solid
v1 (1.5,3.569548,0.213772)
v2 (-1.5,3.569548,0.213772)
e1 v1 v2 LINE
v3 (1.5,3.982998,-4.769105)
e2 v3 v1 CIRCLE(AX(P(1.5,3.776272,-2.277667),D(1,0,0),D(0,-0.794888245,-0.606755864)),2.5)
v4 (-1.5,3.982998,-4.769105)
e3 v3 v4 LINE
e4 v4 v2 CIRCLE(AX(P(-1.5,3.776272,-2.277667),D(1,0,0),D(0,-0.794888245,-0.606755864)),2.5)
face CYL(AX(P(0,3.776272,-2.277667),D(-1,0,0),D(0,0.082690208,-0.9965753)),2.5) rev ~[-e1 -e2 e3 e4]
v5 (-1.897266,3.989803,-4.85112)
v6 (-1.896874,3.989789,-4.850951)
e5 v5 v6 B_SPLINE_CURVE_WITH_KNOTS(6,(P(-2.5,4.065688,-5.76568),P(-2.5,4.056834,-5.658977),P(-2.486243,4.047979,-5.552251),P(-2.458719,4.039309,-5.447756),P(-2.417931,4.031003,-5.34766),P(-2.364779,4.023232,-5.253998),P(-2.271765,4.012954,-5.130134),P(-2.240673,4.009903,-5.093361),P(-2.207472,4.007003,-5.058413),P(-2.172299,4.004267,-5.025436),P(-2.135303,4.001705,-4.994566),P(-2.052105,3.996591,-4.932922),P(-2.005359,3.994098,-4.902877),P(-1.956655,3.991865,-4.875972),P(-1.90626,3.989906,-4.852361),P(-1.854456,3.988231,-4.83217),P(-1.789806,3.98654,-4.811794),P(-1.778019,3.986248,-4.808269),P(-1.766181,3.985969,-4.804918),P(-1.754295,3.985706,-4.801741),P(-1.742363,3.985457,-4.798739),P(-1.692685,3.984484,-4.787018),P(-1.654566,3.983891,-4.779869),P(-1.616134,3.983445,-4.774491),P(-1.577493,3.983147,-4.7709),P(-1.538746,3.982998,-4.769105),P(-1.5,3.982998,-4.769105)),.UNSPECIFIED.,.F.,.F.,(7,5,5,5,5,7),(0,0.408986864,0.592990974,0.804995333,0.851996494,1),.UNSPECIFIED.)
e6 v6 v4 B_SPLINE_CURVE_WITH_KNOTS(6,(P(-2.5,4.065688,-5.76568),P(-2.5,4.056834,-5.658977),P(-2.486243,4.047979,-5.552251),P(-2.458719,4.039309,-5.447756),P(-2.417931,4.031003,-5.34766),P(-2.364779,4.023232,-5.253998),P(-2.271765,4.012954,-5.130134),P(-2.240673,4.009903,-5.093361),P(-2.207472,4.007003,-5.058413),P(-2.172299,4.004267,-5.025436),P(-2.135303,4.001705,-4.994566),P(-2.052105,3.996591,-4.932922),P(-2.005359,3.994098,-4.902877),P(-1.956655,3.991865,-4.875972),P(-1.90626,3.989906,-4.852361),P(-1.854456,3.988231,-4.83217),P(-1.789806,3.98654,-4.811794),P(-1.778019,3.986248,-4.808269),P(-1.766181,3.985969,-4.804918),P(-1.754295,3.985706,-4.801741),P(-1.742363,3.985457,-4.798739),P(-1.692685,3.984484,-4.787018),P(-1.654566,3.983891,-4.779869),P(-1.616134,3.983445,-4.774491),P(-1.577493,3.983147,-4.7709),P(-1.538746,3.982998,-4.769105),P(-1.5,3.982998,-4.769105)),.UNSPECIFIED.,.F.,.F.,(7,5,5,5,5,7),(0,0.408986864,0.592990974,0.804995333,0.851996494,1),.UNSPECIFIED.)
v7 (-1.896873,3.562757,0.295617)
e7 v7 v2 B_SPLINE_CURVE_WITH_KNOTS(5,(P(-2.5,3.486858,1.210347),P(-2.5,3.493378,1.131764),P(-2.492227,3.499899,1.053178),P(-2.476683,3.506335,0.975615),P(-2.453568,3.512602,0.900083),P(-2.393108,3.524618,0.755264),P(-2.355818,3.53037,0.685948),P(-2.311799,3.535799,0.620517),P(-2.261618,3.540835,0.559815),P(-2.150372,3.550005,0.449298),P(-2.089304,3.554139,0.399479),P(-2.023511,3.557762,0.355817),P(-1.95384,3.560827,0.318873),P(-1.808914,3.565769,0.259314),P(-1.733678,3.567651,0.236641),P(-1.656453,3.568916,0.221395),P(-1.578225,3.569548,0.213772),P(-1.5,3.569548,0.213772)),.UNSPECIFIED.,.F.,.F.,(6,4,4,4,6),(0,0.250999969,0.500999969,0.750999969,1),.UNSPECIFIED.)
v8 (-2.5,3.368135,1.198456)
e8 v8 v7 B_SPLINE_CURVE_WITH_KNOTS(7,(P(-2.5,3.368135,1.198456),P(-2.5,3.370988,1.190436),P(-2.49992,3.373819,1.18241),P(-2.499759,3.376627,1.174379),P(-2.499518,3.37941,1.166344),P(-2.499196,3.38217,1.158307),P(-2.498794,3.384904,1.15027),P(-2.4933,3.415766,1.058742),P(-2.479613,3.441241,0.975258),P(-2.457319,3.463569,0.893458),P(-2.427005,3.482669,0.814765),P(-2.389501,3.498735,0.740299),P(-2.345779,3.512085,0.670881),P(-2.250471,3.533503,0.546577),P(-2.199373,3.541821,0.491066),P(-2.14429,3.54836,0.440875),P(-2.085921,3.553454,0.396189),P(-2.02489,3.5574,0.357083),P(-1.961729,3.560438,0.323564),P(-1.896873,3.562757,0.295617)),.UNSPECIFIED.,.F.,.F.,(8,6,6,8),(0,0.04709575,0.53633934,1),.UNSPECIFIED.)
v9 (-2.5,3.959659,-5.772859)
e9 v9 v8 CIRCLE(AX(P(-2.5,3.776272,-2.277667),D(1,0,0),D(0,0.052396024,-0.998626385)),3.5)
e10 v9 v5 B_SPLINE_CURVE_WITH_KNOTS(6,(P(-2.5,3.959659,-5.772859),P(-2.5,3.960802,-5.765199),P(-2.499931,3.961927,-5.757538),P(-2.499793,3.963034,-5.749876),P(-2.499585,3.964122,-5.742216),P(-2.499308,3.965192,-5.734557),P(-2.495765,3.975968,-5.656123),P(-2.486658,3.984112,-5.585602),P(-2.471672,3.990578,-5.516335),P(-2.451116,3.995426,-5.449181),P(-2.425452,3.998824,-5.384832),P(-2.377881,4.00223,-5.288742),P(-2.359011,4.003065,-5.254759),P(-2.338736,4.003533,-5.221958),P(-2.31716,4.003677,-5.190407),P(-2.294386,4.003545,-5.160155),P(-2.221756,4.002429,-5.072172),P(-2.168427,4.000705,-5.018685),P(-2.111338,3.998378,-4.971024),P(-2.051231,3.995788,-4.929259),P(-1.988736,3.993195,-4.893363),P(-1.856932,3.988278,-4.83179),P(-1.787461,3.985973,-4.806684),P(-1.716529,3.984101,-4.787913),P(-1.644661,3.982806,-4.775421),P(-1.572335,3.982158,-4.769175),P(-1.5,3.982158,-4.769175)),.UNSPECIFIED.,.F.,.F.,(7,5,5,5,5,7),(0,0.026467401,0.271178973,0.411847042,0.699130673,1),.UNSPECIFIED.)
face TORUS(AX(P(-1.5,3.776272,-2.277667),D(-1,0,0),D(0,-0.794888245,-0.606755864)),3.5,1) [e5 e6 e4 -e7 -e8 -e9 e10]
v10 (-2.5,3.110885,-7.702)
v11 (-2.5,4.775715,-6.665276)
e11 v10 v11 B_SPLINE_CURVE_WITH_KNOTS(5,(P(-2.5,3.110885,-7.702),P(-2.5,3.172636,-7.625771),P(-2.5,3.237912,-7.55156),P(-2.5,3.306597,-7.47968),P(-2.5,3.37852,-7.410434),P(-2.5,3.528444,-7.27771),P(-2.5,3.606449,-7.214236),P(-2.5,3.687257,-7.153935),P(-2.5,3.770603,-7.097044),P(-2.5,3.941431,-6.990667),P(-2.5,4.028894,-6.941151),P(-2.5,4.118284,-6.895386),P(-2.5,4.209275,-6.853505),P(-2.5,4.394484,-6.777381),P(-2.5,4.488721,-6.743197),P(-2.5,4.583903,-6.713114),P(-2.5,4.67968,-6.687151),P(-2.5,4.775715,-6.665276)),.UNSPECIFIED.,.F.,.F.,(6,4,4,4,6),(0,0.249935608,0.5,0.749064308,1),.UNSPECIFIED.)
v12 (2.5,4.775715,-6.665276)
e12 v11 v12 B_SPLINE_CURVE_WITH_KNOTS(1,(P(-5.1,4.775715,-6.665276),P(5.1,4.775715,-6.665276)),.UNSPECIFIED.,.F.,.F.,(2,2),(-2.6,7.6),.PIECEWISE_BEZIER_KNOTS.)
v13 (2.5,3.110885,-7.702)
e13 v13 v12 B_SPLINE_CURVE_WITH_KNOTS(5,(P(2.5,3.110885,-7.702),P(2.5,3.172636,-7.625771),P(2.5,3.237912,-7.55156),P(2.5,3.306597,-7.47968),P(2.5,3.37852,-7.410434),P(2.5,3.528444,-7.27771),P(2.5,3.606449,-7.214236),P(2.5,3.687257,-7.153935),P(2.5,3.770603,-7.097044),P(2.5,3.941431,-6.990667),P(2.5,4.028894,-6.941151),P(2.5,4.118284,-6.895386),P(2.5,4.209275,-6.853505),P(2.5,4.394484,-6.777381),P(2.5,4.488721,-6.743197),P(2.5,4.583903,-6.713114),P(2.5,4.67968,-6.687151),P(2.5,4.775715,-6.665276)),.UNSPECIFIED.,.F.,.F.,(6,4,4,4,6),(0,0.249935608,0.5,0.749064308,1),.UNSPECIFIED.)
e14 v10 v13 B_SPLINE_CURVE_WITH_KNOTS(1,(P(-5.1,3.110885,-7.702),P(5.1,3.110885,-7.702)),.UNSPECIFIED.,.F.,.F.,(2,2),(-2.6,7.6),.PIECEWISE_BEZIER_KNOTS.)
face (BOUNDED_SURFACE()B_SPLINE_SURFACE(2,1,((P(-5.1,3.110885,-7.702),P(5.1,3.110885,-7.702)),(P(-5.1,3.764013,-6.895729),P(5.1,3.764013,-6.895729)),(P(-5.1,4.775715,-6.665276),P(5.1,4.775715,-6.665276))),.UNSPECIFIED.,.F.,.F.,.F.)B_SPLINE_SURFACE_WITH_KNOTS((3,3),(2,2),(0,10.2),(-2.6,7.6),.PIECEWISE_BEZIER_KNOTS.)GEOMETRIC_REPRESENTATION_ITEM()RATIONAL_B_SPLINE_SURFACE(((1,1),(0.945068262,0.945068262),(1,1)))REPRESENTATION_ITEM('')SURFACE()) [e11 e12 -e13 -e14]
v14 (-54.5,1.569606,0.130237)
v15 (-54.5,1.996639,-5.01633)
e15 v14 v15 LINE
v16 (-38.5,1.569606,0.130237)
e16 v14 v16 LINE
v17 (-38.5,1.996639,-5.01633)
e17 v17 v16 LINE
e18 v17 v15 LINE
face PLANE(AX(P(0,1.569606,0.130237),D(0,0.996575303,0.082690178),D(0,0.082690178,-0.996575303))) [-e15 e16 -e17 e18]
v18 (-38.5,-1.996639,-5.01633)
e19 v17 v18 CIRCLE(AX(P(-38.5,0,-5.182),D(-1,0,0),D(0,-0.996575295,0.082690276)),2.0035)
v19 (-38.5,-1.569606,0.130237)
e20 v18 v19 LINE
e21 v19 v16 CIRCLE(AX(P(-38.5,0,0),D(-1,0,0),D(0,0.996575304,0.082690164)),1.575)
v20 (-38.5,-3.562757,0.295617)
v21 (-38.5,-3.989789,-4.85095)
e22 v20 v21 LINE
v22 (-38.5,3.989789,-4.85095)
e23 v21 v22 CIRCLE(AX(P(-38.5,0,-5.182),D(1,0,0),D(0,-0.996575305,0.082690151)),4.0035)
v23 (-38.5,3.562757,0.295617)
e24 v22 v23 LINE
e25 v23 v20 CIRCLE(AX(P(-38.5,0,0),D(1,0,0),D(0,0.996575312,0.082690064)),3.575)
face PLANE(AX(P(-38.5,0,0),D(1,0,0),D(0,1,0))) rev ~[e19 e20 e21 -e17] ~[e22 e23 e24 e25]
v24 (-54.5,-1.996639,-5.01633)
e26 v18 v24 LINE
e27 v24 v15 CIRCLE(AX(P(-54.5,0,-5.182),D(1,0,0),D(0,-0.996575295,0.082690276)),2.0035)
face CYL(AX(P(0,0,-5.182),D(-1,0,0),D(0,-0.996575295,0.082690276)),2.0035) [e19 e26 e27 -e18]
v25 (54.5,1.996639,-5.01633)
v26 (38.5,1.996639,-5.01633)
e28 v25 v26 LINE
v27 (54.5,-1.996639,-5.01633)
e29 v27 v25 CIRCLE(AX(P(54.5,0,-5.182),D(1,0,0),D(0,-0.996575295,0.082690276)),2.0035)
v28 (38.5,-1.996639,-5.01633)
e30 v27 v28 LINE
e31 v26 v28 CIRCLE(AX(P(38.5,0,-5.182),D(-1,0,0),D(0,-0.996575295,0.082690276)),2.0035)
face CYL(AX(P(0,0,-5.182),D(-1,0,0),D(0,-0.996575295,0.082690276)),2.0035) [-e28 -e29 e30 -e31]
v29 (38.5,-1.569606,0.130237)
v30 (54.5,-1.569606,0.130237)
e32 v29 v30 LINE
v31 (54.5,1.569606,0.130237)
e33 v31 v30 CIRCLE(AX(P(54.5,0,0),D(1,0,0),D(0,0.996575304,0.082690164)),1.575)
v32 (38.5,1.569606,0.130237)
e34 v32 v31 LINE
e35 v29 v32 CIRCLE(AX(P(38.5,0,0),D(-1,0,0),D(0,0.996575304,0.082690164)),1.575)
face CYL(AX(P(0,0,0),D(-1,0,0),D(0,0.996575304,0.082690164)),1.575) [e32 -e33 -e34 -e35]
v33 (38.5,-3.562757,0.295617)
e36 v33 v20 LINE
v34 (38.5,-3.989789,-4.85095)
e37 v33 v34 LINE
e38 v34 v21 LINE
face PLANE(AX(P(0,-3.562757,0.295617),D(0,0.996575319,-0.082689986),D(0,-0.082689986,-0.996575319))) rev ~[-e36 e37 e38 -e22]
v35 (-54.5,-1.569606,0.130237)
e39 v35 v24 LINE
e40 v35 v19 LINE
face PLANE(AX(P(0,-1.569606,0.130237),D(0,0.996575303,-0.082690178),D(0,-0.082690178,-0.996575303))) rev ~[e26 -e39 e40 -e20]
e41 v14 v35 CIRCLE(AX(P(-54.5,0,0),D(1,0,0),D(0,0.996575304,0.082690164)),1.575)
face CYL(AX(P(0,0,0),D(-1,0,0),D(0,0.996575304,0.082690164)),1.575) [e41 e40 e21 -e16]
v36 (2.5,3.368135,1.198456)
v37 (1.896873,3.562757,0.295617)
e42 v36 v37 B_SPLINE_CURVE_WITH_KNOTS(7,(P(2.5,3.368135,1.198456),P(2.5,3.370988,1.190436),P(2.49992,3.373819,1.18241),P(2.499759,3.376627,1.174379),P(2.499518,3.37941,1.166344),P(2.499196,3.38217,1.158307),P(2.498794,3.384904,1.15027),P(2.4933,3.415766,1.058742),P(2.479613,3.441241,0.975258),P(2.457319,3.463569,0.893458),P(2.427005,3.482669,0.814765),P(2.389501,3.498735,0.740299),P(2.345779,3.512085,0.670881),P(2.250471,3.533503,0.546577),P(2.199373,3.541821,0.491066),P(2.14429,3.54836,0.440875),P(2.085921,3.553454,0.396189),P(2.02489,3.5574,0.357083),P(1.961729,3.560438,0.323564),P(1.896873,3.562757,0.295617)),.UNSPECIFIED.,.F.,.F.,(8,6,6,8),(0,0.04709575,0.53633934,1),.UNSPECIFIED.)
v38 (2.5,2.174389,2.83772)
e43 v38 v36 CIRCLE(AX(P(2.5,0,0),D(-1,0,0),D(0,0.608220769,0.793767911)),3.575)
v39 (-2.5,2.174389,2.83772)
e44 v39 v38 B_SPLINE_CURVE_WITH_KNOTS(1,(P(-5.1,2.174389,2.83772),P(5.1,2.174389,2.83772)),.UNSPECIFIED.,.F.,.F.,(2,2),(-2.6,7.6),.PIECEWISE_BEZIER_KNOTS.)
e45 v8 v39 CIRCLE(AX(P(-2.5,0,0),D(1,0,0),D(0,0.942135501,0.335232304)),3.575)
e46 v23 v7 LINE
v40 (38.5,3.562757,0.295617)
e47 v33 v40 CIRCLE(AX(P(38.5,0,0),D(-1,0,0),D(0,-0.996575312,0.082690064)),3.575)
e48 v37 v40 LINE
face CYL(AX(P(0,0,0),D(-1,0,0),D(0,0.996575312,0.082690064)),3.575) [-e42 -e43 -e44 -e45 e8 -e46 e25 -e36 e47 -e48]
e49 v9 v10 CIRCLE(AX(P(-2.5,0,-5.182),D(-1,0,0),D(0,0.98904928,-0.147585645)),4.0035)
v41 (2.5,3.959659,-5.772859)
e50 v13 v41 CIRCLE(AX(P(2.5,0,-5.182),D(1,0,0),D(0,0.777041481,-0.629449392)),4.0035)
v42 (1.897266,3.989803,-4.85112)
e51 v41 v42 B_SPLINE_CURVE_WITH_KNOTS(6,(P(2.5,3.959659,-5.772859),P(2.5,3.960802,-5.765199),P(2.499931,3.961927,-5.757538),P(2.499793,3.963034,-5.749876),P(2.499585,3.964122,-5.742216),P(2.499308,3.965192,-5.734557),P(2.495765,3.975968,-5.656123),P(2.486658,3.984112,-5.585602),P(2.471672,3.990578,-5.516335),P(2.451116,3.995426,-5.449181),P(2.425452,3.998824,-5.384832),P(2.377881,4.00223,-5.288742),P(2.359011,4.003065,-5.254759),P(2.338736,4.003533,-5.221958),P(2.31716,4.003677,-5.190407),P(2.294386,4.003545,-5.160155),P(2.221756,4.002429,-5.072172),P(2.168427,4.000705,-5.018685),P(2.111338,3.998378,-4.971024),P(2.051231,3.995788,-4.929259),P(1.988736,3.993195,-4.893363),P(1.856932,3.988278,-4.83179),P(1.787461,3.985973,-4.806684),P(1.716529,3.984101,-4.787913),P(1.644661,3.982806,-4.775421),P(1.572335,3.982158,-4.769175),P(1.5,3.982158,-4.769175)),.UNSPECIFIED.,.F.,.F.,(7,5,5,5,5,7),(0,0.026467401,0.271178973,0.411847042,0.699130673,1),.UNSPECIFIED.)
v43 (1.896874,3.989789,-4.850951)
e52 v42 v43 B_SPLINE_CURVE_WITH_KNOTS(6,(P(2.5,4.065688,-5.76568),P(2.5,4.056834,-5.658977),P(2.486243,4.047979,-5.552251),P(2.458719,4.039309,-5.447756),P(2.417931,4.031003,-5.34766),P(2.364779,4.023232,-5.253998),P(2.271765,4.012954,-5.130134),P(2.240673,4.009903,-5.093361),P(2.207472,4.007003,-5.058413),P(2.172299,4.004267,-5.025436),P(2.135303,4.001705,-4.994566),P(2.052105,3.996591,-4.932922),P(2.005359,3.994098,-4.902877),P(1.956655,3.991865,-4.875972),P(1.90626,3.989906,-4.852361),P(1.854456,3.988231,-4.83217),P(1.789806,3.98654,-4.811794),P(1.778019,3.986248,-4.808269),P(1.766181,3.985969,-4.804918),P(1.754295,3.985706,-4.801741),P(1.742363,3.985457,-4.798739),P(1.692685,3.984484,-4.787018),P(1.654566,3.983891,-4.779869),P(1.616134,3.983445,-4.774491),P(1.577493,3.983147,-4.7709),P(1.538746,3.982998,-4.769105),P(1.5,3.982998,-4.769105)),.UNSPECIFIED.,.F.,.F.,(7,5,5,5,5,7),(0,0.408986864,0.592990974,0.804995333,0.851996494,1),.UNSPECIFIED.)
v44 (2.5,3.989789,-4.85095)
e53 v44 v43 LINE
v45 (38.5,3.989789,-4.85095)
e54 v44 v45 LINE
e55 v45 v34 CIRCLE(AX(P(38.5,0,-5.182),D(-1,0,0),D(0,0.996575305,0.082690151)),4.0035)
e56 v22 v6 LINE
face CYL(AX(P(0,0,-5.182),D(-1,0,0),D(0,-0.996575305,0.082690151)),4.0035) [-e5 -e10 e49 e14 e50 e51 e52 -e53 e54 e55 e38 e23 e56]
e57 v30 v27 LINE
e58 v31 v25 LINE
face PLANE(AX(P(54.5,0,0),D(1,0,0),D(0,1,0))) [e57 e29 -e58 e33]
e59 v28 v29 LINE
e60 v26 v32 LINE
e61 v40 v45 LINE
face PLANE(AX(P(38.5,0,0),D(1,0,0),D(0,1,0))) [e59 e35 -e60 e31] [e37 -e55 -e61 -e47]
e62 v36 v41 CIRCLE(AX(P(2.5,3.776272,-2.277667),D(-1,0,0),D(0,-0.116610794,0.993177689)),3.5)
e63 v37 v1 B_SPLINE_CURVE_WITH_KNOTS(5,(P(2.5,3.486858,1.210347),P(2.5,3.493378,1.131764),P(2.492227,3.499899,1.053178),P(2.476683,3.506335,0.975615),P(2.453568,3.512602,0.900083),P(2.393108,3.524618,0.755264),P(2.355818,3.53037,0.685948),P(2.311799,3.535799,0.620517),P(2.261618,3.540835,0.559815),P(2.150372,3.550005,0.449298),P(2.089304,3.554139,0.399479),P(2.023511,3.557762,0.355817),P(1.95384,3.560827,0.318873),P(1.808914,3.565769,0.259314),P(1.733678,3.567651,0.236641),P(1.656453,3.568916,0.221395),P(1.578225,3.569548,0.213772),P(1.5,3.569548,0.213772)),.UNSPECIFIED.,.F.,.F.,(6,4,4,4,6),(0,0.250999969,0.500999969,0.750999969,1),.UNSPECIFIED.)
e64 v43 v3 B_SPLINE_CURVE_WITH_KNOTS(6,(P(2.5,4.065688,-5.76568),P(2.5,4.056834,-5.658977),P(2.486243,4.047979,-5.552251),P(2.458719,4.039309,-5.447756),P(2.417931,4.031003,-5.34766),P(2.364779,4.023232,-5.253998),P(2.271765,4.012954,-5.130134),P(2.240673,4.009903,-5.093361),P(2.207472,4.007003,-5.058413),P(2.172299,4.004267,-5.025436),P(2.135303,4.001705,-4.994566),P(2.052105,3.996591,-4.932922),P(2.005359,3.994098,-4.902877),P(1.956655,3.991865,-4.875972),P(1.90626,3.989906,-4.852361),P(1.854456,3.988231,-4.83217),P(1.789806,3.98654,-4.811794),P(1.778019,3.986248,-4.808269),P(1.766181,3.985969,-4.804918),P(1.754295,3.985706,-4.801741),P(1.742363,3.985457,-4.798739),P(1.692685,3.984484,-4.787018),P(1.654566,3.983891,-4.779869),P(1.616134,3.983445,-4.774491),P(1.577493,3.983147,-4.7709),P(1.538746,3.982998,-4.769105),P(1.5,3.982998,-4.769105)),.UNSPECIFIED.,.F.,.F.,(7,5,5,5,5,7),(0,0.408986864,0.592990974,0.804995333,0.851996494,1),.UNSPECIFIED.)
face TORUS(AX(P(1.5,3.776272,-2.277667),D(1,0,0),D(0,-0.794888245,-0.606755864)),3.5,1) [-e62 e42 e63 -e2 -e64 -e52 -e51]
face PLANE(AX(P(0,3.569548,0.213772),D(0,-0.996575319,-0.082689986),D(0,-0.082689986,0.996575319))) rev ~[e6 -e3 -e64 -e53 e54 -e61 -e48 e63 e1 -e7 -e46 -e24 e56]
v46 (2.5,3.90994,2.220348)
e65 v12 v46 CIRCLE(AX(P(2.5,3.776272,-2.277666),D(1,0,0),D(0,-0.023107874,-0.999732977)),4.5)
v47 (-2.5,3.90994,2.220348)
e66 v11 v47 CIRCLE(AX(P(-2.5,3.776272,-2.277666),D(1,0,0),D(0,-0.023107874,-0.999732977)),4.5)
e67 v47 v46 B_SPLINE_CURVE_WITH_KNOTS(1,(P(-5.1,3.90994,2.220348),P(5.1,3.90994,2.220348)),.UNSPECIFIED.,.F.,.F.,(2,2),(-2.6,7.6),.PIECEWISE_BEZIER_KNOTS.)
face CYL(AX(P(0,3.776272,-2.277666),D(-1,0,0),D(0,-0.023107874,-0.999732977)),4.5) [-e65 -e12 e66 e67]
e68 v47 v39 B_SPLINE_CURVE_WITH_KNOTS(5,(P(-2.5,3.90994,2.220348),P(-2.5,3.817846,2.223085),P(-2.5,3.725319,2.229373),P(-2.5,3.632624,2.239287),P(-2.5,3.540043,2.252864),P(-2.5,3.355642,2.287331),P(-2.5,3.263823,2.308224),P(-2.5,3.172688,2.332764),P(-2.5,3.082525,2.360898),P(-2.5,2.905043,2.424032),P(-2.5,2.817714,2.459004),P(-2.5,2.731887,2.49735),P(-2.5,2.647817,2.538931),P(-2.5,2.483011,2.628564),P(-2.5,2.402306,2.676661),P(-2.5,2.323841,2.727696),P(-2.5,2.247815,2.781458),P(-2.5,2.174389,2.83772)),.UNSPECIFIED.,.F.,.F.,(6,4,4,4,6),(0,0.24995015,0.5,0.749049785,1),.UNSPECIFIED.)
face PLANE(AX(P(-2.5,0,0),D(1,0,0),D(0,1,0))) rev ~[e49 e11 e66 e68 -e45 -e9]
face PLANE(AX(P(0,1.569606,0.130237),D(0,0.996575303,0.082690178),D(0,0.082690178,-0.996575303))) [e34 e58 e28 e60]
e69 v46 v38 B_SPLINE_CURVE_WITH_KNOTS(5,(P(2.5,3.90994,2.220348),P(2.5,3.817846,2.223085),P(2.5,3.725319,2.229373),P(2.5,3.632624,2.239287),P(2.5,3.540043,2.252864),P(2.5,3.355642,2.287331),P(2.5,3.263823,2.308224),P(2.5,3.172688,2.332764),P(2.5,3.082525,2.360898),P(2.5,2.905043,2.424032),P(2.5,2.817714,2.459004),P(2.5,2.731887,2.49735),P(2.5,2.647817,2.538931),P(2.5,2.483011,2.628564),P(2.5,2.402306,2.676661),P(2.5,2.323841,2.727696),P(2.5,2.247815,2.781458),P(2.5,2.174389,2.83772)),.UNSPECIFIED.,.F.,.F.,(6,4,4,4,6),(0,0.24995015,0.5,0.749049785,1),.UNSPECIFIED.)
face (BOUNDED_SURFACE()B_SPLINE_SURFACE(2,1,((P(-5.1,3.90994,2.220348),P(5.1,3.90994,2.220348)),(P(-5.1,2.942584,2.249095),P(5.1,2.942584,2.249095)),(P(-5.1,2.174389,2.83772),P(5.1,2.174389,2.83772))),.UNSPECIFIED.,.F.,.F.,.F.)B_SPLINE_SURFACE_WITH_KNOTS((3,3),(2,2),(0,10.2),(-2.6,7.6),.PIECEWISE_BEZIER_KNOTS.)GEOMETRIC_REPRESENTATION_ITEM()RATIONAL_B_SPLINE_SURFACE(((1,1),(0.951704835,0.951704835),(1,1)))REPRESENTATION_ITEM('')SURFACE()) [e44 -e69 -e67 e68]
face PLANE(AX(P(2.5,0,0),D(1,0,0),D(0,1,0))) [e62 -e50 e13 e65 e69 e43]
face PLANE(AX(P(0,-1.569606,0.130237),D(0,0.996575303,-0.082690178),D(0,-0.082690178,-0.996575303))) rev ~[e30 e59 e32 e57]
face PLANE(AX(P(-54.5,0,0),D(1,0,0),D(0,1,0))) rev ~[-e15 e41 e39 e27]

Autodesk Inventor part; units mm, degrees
ref_plane "YZ Plane" through (0, 0, 0) normal (1, 0, 0) x (0, 1, 0)
ref_plane "XZ Plane" through (0, 0, 0) normal (0, 1, 0) x (-1, 0, 0)
ref_plane "XY Plane" through (0, 0, 0) normal (0, 0, 1) x (1, 0, 0)
sketch "Sketch1" plane through (0, 0, 0) normal (1, 0, 0) x (0, 1, 0)
  arc A0 (1.569606, 0.130237) -> (-1.569606, 0.130237) centre (0, 0) ccw
  arc A1 (-1.996639, -5.01633) -> (1.996639, -5.01633) centre (0, -5.182) ccw
  line L0 (1.569606, 0.130237) -> (1.996639, -5.01633)
  line L1 (-1.569606, 0.130237) -> (-1.996639, -5.01633)
  arc A2 (1.996639, -5.01633) -> (-1.996639, -5.01633) centre (0, -5.182) ccw construction
  arc A3 (-1.569606, 0.130237) -> (1.569606, 0.130237) centre (0, 0) ccw construction
  line L2 (3.989789, -4.85095) -> (3.562757, 0.295617)
  arc A4 (3.562757, 0.295617) -> (-3.562757, 0.295617) centre (0, 0) ccw
  line L3 (-3.562757, 0.295617) -> (-3.989789, -4.85095)
  arc A5 (-3.989789, -4.85095) -> (3.989789, -4.85095) centre (0, -5.182) ccw
  arc A6 (3.982998, -4.769105) -> (3.569548, 0.213772) centre (3.776273, -2.277667) ccw
  arc A7 (0.970465, 1.240493) -> (3.672287, -6.776465) centre (3.776273, -2.277667) ccw construction
  arc A8 (2.870948, 2.130325) -> (0.970465, 1.240493) centre (3.776273, -2.277667) ccw construction
  arc A9 (3.672287, -6.776465) -> (2.870948, 2.130325) centre (3.776273, -2.277667) ccw
  arc A10 (1.907157, -3.93791) -> (3.982998, -4.769105) centre (3.776273, -2.277667) ccw construction
  arc A11 (3.569548, 0.213772) -> (1.907157, -3.93791) centre (3.776273, -2.277667) ccw construction
  point P0 (-1.527231, 0.384956)
  point P1 (-1.942735, -4.692312)
  point P2 (1.569795, -0.127934)
  point P3 (1.996879, -5.344741)
  dimension "d12" = 0
  dimension "d0" = 5.182
  dimension "d1" = 0
  dimension "d2" = 3.15
  dimension "d3" = 4.007
  dimension "d4" = 2
  dimension "d9" = 5
  dimension "d10" = 9
extrude "Extrusion1" add sketch "Sketch1" along normal mid plane 77 contours L0 A1 L1 A0 | A5 L3 A4 L2
extrude "Extrusion2" add sketch "Sketch1" along normal mid plane 109 contours L0 A1 L1 A0
extrude "Extrusion3" add sketch "Sketch1" along normal mid plane 5 contours L2 A6 A4 A9 A5
fillet "Fillet1" radius 3 2 edges at (0, 3.6723, -6.7765) (0, 2.8709, 2.1303)
fillet "Fillet2" radius 1 2 edges at (2.5, 6.2677, -2.0709) (-2.5, 6.2677, -2.0709)
properties part number "ChargingArm - ConnectingBrace"
